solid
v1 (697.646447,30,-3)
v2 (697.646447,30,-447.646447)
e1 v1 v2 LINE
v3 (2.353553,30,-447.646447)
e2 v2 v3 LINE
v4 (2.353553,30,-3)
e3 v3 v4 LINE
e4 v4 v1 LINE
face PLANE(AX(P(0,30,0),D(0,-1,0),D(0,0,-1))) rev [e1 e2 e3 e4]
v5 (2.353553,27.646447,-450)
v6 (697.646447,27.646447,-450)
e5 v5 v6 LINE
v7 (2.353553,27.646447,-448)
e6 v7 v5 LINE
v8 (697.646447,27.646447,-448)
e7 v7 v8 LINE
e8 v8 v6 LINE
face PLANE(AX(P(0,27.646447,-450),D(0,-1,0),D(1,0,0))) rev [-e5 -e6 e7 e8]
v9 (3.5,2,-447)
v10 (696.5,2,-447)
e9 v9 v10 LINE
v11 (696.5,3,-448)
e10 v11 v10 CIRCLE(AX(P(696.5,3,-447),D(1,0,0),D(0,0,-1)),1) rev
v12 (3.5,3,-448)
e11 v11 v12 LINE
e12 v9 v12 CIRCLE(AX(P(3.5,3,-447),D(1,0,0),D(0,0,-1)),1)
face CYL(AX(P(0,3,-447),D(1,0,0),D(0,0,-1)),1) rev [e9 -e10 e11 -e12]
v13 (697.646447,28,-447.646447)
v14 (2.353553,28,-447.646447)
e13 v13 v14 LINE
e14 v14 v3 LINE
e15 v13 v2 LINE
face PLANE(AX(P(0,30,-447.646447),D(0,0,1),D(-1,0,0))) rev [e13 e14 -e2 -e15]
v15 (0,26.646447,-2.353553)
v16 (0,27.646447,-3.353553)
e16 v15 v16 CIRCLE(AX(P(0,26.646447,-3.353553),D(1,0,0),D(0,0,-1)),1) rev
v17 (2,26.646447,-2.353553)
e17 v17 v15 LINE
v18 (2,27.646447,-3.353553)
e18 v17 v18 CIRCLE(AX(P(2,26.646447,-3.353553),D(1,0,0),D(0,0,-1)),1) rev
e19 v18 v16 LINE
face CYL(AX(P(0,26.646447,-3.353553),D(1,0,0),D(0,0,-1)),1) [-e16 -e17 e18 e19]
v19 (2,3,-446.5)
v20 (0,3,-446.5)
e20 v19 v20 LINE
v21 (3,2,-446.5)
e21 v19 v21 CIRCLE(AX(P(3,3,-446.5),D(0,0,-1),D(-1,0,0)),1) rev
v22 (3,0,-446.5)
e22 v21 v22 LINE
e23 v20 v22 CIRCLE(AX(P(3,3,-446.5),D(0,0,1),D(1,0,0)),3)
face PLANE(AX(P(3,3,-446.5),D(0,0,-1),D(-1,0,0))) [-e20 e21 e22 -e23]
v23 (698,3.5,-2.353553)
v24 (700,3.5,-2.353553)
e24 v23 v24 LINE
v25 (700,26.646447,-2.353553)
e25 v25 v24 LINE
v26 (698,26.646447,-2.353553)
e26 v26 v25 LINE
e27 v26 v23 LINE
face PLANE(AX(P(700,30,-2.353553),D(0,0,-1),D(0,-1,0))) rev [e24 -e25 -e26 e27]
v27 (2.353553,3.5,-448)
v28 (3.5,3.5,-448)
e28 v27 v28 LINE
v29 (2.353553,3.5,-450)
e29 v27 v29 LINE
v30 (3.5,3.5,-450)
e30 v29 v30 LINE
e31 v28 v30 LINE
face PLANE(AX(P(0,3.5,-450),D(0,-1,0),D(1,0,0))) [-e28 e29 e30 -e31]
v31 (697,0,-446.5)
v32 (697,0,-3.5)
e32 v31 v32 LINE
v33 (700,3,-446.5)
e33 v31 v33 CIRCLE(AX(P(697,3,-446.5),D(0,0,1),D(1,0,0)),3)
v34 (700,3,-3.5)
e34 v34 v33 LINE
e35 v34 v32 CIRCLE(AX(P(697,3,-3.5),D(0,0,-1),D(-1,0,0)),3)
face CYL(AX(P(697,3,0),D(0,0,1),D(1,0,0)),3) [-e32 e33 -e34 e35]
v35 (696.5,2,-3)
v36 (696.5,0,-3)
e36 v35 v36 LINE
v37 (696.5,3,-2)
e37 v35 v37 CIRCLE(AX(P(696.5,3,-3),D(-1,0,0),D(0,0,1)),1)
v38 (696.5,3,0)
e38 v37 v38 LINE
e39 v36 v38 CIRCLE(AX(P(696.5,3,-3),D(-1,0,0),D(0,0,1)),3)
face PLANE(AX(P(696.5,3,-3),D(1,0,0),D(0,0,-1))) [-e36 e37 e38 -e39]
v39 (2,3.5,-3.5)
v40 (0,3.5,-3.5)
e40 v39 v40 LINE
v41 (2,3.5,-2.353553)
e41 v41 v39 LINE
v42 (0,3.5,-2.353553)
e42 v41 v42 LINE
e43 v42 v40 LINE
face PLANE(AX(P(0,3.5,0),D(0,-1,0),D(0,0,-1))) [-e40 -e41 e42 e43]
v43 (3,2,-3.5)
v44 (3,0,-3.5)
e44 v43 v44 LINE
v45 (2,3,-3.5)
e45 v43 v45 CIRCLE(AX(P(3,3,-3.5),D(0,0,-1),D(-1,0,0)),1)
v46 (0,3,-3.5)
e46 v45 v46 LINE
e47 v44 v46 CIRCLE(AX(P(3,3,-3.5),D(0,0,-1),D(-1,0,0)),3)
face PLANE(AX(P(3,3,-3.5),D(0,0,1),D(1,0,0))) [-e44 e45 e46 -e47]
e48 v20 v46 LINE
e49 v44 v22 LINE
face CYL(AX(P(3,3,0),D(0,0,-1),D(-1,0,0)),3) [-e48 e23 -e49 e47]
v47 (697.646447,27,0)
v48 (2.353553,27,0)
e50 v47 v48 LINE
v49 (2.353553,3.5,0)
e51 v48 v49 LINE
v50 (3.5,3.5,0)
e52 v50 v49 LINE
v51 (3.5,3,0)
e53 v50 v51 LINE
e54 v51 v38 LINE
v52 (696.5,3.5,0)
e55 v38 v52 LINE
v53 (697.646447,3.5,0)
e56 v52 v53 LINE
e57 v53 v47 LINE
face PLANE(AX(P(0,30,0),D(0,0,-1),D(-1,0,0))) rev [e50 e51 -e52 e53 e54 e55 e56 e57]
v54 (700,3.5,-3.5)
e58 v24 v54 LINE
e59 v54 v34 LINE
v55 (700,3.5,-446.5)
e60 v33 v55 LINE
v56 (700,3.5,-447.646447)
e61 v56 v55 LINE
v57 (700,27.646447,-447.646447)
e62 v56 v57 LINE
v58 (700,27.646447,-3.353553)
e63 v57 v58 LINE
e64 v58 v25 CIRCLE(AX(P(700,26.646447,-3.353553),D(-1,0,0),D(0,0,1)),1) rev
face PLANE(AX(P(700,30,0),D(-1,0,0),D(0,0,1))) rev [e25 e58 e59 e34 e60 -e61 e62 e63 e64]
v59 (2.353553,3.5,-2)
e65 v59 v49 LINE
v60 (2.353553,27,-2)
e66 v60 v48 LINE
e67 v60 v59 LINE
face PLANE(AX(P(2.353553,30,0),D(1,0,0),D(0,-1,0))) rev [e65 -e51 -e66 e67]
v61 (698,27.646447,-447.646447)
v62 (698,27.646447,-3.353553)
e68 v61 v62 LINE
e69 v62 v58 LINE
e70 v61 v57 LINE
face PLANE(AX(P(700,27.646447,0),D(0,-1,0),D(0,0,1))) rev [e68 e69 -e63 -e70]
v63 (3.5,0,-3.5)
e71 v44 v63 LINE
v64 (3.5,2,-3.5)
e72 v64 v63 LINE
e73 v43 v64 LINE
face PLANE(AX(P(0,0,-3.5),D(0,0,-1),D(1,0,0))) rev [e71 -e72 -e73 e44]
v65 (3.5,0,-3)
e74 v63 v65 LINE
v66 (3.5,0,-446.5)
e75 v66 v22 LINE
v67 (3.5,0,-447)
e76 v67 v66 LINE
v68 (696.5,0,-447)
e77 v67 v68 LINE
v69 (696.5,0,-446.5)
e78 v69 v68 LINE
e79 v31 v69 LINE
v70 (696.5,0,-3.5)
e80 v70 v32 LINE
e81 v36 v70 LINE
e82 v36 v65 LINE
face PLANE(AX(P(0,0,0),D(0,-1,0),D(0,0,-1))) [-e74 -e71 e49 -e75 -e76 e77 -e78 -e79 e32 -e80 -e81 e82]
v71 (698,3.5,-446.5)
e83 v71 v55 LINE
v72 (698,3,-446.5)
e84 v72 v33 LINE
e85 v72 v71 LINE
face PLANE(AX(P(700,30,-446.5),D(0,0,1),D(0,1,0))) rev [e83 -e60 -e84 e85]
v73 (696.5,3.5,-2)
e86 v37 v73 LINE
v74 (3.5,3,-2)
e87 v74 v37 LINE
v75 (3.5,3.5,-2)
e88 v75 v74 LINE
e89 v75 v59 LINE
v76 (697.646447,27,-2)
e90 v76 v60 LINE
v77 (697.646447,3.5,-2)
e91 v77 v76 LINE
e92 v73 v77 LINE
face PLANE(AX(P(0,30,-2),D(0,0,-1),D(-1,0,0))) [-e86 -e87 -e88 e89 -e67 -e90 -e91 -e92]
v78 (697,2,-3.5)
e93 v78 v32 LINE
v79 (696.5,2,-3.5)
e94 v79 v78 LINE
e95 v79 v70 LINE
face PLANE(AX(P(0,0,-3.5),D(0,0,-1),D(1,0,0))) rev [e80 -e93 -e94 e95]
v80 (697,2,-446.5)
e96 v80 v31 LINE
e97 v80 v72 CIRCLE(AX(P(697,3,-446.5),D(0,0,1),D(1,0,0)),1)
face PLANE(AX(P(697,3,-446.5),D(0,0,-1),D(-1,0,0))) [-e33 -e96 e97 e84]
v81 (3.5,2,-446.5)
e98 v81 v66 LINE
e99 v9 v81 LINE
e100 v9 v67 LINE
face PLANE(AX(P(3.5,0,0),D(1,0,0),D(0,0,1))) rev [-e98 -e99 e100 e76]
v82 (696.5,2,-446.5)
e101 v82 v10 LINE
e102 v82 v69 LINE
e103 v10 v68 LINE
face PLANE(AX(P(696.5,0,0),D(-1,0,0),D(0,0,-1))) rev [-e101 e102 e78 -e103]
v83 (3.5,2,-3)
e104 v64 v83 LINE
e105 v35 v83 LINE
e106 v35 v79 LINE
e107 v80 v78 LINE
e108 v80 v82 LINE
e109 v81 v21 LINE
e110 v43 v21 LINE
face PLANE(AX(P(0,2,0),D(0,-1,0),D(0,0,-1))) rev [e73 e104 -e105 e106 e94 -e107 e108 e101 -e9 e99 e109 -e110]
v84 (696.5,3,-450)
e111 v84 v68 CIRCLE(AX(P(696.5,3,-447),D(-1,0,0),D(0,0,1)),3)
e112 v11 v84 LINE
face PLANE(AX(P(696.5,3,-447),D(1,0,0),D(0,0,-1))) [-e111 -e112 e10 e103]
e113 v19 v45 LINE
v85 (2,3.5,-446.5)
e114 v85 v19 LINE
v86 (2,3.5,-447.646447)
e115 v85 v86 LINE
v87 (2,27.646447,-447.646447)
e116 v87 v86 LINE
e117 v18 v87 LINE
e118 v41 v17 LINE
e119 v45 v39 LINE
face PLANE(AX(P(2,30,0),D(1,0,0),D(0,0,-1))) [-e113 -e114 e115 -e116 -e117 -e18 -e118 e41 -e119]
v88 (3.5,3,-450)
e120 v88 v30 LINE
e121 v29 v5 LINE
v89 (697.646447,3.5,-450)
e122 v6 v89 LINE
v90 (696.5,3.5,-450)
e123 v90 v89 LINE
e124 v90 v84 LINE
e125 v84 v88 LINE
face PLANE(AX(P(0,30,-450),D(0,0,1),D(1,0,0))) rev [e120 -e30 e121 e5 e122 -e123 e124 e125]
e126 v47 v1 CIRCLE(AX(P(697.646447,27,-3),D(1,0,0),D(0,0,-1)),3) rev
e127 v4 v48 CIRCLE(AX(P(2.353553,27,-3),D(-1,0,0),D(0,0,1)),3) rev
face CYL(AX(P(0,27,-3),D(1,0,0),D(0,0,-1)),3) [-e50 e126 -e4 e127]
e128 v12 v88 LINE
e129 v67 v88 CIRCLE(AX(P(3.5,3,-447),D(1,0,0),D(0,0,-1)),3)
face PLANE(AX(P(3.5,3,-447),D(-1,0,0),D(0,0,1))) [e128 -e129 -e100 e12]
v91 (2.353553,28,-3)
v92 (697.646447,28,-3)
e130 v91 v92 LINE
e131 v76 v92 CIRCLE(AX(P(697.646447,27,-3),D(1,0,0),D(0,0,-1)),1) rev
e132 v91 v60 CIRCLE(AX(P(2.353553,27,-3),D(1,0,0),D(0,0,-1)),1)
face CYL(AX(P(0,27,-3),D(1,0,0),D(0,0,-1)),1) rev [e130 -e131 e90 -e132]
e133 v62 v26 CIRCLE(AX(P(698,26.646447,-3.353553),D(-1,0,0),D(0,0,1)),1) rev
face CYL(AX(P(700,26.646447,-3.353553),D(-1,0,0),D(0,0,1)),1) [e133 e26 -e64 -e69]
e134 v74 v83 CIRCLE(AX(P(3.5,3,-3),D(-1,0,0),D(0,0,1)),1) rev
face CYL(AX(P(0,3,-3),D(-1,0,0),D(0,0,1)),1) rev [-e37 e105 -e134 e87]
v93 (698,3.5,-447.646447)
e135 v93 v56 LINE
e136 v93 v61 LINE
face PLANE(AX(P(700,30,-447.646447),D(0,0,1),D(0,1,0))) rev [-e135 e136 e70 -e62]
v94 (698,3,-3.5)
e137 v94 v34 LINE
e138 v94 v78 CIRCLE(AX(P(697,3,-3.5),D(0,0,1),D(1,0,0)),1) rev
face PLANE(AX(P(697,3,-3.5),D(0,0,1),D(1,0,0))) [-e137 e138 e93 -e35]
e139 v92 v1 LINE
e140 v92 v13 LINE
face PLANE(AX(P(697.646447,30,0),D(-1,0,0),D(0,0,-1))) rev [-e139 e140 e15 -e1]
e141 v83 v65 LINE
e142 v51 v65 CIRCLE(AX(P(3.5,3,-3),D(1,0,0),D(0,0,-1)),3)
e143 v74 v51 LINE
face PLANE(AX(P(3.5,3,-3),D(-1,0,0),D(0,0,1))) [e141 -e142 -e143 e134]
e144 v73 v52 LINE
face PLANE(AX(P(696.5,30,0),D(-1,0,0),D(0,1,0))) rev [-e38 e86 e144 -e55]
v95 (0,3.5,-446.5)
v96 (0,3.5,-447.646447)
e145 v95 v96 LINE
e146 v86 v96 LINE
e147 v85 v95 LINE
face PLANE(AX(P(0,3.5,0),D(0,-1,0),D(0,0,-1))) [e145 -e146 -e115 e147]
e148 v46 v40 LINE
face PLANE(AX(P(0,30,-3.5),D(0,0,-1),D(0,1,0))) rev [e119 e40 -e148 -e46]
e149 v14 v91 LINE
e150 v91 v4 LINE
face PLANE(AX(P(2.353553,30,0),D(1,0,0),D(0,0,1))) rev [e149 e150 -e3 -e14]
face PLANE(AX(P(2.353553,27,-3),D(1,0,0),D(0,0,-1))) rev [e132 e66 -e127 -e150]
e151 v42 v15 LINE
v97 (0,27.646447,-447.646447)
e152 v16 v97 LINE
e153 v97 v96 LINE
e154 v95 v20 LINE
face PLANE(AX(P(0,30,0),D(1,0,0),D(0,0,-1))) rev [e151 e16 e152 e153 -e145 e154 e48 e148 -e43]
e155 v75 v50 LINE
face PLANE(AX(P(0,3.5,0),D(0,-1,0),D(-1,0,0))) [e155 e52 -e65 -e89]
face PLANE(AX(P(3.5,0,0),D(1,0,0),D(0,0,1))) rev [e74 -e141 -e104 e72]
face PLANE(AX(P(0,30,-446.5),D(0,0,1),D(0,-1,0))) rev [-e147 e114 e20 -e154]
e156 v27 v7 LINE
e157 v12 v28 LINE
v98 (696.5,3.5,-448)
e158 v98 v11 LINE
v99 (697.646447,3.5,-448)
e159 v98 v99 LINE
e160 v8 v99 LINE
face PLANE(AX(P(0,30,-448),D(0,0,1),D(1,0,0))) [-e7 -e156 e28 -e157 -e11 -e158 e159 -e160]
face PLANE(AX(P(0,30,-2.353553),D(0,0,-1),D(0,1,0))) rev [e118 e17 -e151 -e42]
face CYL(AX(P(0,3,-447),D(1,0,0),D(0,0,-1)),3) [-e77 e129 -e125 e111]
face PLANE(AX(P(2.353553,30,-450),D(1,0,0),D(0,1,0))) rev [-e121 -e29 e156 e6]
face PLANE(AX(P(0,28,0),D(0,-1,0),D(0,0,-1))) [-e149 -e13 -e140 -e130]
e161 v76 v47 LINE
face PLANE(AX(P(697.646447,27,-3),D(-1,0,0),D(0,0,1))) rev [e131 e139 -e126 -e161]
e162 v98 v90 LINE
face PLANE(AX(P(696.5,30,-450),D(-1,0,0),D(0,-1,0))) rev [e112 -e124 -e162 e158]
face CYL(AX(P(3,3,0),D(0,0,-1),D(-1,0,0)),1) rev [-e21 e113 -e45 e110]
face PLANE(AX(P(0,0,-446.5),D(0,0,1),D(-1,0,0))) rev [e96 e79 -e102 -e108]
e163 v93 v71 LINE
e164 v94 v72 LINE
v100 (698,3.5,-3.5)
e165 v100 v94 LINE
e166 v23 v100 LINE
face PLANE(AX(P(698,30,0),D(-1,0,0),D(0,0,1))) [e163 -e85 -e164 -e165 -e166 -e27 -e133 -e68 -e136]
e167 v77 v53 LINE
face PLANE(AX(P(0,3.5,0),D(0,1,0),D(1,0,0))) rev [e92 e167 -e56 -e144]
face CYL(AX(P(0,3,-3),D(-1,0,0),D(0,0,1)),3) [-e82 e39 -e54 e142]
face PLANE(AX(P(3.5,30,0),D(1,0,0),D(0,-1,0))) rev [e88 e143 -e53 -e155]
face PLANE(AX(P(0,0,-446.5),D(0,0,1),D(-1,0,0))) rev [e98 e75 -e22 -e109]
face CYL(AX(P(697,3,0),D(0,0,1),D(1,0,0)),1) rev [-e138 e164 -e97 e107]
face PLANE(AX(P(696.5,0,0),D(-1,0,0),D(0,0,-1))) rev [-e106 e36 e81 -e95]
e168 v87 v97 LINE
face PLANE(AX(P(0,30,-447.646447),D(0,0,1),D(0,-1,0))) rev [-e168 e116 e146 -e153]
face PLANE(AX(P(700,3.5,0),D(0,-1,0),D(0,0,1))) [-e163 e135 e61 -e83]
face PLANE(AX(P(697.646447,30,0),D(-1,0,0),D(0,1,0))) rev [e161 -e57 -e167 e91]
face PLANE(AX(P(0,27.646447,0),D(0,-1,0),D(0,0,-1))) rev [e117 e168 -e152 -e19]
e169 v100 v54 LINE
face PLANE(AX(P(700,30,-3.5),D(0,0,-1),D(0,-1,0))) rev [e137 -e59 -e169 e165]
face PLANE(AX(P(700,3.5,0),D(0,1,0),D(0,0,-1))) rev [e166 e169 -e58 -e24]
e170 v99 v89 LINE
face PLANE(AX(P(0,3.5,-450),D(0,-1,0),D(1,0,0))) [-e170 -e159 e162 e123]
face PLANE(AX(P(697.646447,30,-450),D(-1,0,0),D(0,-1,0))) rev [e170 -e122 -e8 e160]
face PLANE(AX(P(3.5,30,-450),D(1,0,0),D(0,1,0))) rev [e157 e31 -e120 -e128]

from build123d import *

# Parameters (mm, degrees)
SKETCH2_W                  = 700
SKETCH2_H                  = 450
BOSS_EXTRUDE1_DEPTH        = 30
CONVERT_SOLID1_START       = 3
CONVERT_SOLID1_DEPTH       = 694
CONVERT_SOLID1_2_OUTLINE_W = 24.146446609
CONVERT_SOLID1_2_OUTLINE_H = 2
CONVERT_SOLID1_2_DEPTH     = 2.353553391
CONVERT_SOLID1_START_2     = 697.646446609
CONVERT_SOLID1_3_OUTLINE_W = 24.146446609
CONVERT_SOLID1_3_OUTLINE_H = 2
CONVERT_SOLID1_3_DEPTH     = 2.353553391
CONVERT_SOLID1_4_DEPTH     = 700
CONVERT_SOLID1_5_DEPTH     = 2.353553391
CONVERT_SOLID1_6_DEPTH     = 2.353553391
CONVERT_SOLID1_START_3     = 2.353553391
CONVERT_SOLID1_7_DEPTH     = 1.146446609
CONVERT_SOLID1_START_4     = 696.5
CONVERT_SOLID1_8_DEPTH     = 1.146446609
CONVERT_SOLID1_START_5     = -447.646446609
CONVERT_SOLID1_9_DEPTH     = 445.292893218


with BuildPart() as part:
    # Sketch2 → Boss-Extrude1 (new body)
    with BuildSketch(Plane(origin=(0, 0, 0), x_dir=(1, 0, 0), z_dir=(0, 1, 0))):
        with Locations((350, 225)):
            Rectangle(SKETCH2_W, SKETCH2_H)
    extrude(amount=BOSS_EXTRUDE1_DEPTH)

    # Convert-Solid1: read off the stored shape, not the designer's step
    # Convert-Solid1 outline → Convert-Solid1 (cut)
    with BuildSketch(Plane.YZ.offset(CONVERT_SOLID1_START)):
        with BuildLine():
            Line((3.5, -3.5), (2, -3.5))
            Line((2, -3.5), (2, -446.5))
            Line((2, -446.5), (3.5, -446.5))
            Line((3.5, -446.5), (3.5, -447.646446609))
            Line((3.5, -447.646446609), (27.646446609, -447.646446609))
            Line((27.646446609, -447.646446609), (27.646446609, -3.353553391))
            ThreePointArc((27.646446609, -3.353553391), (27.353553391, -2.646446609), (26.646446609, -2.353553391))
            Line((26.646446609, -2.353553391), (3.5, -2.353553391))
            Line((3.5, -2.353553391), (3.5, -3.5))
        make_face()
    extrude(amount=CONVERT_SOLID1_DEPTH, mode=Mode.SUBTRACT)

    # Convert-Solid1 2 outline → Convert-Solid1 2 (cut)
    with BuildSketch(Plane.YZ):
        with Locations((15.573223305, -449)):
            Rectangle(CONVERT_SOLID1_2_OUTLINE_W, CONVERT_SOLID1_2_OUTLINE_H)
    extrude(amount=CONVERT_SOLID1_2_DEPTH, mode=Mode.SUBTRACT)

    # Convert-Solid1 3 outline → Convert-Solid1 3 (cut)
    with BuildSketch(Plane.YZ.offset(CONVERT_SOLID1_START_2)):
        with Locations((15.573223305, -449)):
            Rectangle(CONVERT_SOLID1_3_OUTLINE_W, CONVERT_SOLID1_3_OUTLINE_H)
    extrude(amount=CONVERT_SOLID1_3_DEPTH, mode=Mode.SUBTRACT)

    # Convert-Solid1 4 outline → Convert-Solid1 4 (cut)
    with BuildSketch(Plane.YZ):
        with BuildLine():
            Line((2, -3), (2, -3.5))
            Line((2, -3.5), (3.5, -3.5))
            Line((3.5, -3.5), (3.5, -2.353553391))
            Line((3.5, -2.353553391), (26.646446609, -2.353553391))
            ThreePointArc((26.646446609, -2.353553391), (27.353553391, -2.646446609), (27.646446609, -3.353553391))
            Line((27.646446609, -3.353553391), (27.646446609, -447.646446609))
            Line((27.646446609, -447.646446609), (3.5, -447.646446609))
            Line((3.5, -447.646446609), (3.5, -446.5))
            Line((3.5, -446.5), (2, -446.5))
            Line((2, -446.5), (2, -447))
            ThreePointArc((2, -447), (2.292893219, -447.707106781), (3, -448))
            Line((3, -448), (27.646446609, -448))
            Line((27.646446609, -448), (27.646446609, -450))
            Line((27.646446609, -450), (30, -450))
            Line((30, -450), (30, -447.646446609))
            Line((30, -447.646446609), (28, -447.646446609))
            Line((28, -447.646446609), (28, -3))
            ThreePointArc((28, -3), (27.707106781, -2.292893219), (27, -2))
            Line((27, -2), (3, -2))
            ThreePointArc((3, -2), (2.292893219, -2.292893219), (2, -3))
        make_face()
        with BuildLine():
            Line((0, 0), (0, -3))
            ThreePointArc((0, -3), (0.878679656, -0.878679656), (3, 0))
            Line((3, 0), (0, 0))
        make_face()
        with BuildLine():
            ThreePointArc((3, -450), (0.878679656, -449.121320344), (0, -447))
            Line((0, -447), (0, -450))
            Line((0, -450), (3, -450))
        make_face()
        with BuildLine():
            Line((30, 0), (27, 0))
            ThreePointArc((27, 0), (29.121320344, -0.878679656), (30, -3))
            Line((30, -3), (30, 0))
        make_face()
    extrude(amount=CONVERT_SOLID1_4_DEPTH, mode=Mode.SUBTRACT)

    # Convert-Solid1 5 outline → Convert-Solid1 5 (cut)
    with BuildSketch(Plane.YZ):
        with BuildLine():
            Line((0, -3), (0, -3.5))
            Line((0, -3.5), (2, -3.5))
            Line((2, -3.5), (2, -3))
            ThreePointArc((2, -3), (2.292893219, -2.292893219), (3, -2))
            Line((3, -2), (27, -2))
            ThreePointArc((27, -2), (27.707106781, -2.292893219), (28, -3))
            Line((28, -3), (28, -447.646446609))
            Line((28, -447.646446609), (30, -447.646446609))
            Line((30, -447.646446609), (30, -3))
            ThreePointArc((30, -3), (29.121320344, -0.878679656), (27, 0))
            Line((27, 0), (3, 0))
            ThreePointArc((3, 0), (0.878679656, -0.878679656), (0, -3))
        make_face()
        with BuildLine():
            Line((2, -446.5), (0, -446.5))
            Line((0, -446.5), (0, -447))
            ThreePointArc((0, -447), (0.878679656, -449.121320344), (3, -450))
            Line((3, -450), (3.5, -450))
            Line((3.5, -450), (3.5, -448))
            Line((3.5, -448), (3, -448))
            ThreePointArc((3, -448), (2.292893219, -447.707106781), (2, -447))
            Line((2, -447), (2, -446.5))
        make_face()
    extrude(amount=CONVERT_SOLID1_5_DEPTH, mode=Mode.SUBTRACT)

    # Convert-Solid1 6 outline → Convert-Solid1 6 (cut)
    with BuildSketch(Plane.YZ.offset(CONVERT_SOLID1_START_2)):
        with BuildLine():
            Line((0, -3), (0, -3.5))
            Line((0, -3.5), (2, -3.5))
            Line((2, -3.5), (2, -3))
            ThreePointArc((2, -3), (2.292893219, -2.292893219), (3, -2))
            Line((3, -2), (27, -2))
            ThreePointArc((27, -2), (27.707106781, -2.292893219), (28, -3))
            Line((28, -3), (28, -447.646446609))
            Line((28, -447.646446609), (30, -447.646446609))
            Line((30, -447.646446609), (30, -3))
            ThreePointArc((30, -3), (29.121320344, -0.878679656), (27, 0))
            Line((27, 0), (3, 0))
            ThreePointArc((3, 0), (0.878679656, -0.878679656), (0, -3))
        make_face()
        with BuildLine():
            Line((2, -446.5), (0, -446.5))
            Line((0, -446.5), (0, -447))
            ThreePointArc((0, -447), (0.878679656, -449.121320344), (3, -450))
            Line((3, -450), (3.5, -450))
            Line((3.5, -450), (3.5, -448))
            Line((3.5, -448), (3, -448))
            ThreePointArc((3, -448), (2.292893219, -447.707106781), (2, -447))
            Line((2, -447), (2, -446.5))
        make_face()
    extrude(amount=CONVERT_SOLID1_6_DEPTH, mode=Mode.SUBTRACT)

    # Convert-Solid1 7 outline → Convert-Solid1 7 (cut)
    with BuildSketch(Plane.YZ.offset(CONVERT_SOLID1_START_3)):
        with BuildLine():
            Line((0, -3), (0, -3.5))
            Line((0, -3.5), (2, -3.5))
            Line((2, -3.5), (2, -3))
            ThreePointArc((2, -3), (2.292893219, -2.292893219), (3, -2))
            Line((3, -2), (3.5, -2))
            Line((3.5, -2), (3.5, 0))
            Line((3.5, 0), (3, 0))
            ThreePointArc((3, 0), (0.878679656, -0.878679656), (0, -3))
        make_face()
        with BuildLine():
            Line((2, -446.5), (0, -446.5))
            Line((0, -446.5), (0, -447))
            ThreePointArc((0, -447), (0.878679656, -449.121320344), (3, -450))
            Line((3, -450), (3.5, -450))
            Line((3.5, -450), (3.5, -448))
            Line((3.5, -448), (3, -448))
            ThreePointArc((3, -448), (2.292893219, -447.707106781), (2, -447))
            Line((2, -447), (2, -446.5))
        make_face()
    extrude(amount=CONVERT_SOLID1_7_DEPTH, mode=Mode.SUBTRACT)

    # Convert-Solid1 8 outline → Convert-Solid1 8 (cut)
    with BuildSketch(Plane.YZ.offset(CONVERT_SOLID1_START_4)):
        with BuildLine():
            Line((0, -3), (0, -3.5))
            Line((0, -3.5), (2, -3.5))
            Line((2, -3.5), (2, -3))
            ThreePointArc((2, -3), (2.292893219, -2.292893219), (3, -2))
            Line((3, -2), (3.5, -2))
            Line((3.5, -2), (3.5, 0))
            Line((3.5, 0), (3, 0))
            ThreePointArc((3, 0), (0.878679656, -0.878679656), (0, -3))
        make_face()
        with BuildLine():
            Line((2, -446.5), (0, -446.5))
            Line((0, -446.5), (0, -447))
            ThreePointArc((0, -447), (0.878679656, -449.121320344), (3, -450))
            Line((3, -450), (3.5, -450))
            Line((3.5, -450), (3.5, -448))
            Line((3.5, -448), (3, -448))
            ThreePointArc((3, -448), (2.292893219, -447.707106781), (2, -447))
            Line((2, -447), (2, -446.5))
        make_face()
    extrude(amount=CONVERT_SOLID1_8_DEPTH, mode=Mode.SUBTRACT)

    # Convert-Solid1 9 outline → Convert-Solid1 9 (cut)
    with BuildSketch(Plane.XY.offset(CONVERT_SOLID1_START_5)):
        with BuildLine():
            Line((0, 0), (3, 0))
            ThreePointArc((3, 0), (0.878679656, 0.878679656), (0, 3))
            Line((0, 3), (0, 0))
        make_face()
        with BuildLine():
            ThreePointArc((700, 3), (699.121320344, 0.878679656), (697, 0))
            Line((697, 0), (700, 0))
            Line((700, 0), (700, 3))
        make_face()
        with BuildLine():
            Line((697, 27.646446609), (697, 2))
            ThreePointArc((697, 2), (697.707106781, 2.292893219), (698, 3))
            Line((698, 3), (698, 27.646446609))
            Line((698, 27.646446609), (697, 27.646446609))
        make_face()
        with BuildLine():
            Line((3, 2), (3, 27.646446609))
            Line((3, 27.646446609), (2, 27.646446609))
            Line((2, 27.646446609), (2, 3))
            ThreePointArc((2, 3), (2.292893219, 2.292893219), (3, 2))
        make_face()
    extrude(amount=CONVERT_SOLID1_9_DEPTH, mode=Mode.SUBTRACT)


solid = part.part
